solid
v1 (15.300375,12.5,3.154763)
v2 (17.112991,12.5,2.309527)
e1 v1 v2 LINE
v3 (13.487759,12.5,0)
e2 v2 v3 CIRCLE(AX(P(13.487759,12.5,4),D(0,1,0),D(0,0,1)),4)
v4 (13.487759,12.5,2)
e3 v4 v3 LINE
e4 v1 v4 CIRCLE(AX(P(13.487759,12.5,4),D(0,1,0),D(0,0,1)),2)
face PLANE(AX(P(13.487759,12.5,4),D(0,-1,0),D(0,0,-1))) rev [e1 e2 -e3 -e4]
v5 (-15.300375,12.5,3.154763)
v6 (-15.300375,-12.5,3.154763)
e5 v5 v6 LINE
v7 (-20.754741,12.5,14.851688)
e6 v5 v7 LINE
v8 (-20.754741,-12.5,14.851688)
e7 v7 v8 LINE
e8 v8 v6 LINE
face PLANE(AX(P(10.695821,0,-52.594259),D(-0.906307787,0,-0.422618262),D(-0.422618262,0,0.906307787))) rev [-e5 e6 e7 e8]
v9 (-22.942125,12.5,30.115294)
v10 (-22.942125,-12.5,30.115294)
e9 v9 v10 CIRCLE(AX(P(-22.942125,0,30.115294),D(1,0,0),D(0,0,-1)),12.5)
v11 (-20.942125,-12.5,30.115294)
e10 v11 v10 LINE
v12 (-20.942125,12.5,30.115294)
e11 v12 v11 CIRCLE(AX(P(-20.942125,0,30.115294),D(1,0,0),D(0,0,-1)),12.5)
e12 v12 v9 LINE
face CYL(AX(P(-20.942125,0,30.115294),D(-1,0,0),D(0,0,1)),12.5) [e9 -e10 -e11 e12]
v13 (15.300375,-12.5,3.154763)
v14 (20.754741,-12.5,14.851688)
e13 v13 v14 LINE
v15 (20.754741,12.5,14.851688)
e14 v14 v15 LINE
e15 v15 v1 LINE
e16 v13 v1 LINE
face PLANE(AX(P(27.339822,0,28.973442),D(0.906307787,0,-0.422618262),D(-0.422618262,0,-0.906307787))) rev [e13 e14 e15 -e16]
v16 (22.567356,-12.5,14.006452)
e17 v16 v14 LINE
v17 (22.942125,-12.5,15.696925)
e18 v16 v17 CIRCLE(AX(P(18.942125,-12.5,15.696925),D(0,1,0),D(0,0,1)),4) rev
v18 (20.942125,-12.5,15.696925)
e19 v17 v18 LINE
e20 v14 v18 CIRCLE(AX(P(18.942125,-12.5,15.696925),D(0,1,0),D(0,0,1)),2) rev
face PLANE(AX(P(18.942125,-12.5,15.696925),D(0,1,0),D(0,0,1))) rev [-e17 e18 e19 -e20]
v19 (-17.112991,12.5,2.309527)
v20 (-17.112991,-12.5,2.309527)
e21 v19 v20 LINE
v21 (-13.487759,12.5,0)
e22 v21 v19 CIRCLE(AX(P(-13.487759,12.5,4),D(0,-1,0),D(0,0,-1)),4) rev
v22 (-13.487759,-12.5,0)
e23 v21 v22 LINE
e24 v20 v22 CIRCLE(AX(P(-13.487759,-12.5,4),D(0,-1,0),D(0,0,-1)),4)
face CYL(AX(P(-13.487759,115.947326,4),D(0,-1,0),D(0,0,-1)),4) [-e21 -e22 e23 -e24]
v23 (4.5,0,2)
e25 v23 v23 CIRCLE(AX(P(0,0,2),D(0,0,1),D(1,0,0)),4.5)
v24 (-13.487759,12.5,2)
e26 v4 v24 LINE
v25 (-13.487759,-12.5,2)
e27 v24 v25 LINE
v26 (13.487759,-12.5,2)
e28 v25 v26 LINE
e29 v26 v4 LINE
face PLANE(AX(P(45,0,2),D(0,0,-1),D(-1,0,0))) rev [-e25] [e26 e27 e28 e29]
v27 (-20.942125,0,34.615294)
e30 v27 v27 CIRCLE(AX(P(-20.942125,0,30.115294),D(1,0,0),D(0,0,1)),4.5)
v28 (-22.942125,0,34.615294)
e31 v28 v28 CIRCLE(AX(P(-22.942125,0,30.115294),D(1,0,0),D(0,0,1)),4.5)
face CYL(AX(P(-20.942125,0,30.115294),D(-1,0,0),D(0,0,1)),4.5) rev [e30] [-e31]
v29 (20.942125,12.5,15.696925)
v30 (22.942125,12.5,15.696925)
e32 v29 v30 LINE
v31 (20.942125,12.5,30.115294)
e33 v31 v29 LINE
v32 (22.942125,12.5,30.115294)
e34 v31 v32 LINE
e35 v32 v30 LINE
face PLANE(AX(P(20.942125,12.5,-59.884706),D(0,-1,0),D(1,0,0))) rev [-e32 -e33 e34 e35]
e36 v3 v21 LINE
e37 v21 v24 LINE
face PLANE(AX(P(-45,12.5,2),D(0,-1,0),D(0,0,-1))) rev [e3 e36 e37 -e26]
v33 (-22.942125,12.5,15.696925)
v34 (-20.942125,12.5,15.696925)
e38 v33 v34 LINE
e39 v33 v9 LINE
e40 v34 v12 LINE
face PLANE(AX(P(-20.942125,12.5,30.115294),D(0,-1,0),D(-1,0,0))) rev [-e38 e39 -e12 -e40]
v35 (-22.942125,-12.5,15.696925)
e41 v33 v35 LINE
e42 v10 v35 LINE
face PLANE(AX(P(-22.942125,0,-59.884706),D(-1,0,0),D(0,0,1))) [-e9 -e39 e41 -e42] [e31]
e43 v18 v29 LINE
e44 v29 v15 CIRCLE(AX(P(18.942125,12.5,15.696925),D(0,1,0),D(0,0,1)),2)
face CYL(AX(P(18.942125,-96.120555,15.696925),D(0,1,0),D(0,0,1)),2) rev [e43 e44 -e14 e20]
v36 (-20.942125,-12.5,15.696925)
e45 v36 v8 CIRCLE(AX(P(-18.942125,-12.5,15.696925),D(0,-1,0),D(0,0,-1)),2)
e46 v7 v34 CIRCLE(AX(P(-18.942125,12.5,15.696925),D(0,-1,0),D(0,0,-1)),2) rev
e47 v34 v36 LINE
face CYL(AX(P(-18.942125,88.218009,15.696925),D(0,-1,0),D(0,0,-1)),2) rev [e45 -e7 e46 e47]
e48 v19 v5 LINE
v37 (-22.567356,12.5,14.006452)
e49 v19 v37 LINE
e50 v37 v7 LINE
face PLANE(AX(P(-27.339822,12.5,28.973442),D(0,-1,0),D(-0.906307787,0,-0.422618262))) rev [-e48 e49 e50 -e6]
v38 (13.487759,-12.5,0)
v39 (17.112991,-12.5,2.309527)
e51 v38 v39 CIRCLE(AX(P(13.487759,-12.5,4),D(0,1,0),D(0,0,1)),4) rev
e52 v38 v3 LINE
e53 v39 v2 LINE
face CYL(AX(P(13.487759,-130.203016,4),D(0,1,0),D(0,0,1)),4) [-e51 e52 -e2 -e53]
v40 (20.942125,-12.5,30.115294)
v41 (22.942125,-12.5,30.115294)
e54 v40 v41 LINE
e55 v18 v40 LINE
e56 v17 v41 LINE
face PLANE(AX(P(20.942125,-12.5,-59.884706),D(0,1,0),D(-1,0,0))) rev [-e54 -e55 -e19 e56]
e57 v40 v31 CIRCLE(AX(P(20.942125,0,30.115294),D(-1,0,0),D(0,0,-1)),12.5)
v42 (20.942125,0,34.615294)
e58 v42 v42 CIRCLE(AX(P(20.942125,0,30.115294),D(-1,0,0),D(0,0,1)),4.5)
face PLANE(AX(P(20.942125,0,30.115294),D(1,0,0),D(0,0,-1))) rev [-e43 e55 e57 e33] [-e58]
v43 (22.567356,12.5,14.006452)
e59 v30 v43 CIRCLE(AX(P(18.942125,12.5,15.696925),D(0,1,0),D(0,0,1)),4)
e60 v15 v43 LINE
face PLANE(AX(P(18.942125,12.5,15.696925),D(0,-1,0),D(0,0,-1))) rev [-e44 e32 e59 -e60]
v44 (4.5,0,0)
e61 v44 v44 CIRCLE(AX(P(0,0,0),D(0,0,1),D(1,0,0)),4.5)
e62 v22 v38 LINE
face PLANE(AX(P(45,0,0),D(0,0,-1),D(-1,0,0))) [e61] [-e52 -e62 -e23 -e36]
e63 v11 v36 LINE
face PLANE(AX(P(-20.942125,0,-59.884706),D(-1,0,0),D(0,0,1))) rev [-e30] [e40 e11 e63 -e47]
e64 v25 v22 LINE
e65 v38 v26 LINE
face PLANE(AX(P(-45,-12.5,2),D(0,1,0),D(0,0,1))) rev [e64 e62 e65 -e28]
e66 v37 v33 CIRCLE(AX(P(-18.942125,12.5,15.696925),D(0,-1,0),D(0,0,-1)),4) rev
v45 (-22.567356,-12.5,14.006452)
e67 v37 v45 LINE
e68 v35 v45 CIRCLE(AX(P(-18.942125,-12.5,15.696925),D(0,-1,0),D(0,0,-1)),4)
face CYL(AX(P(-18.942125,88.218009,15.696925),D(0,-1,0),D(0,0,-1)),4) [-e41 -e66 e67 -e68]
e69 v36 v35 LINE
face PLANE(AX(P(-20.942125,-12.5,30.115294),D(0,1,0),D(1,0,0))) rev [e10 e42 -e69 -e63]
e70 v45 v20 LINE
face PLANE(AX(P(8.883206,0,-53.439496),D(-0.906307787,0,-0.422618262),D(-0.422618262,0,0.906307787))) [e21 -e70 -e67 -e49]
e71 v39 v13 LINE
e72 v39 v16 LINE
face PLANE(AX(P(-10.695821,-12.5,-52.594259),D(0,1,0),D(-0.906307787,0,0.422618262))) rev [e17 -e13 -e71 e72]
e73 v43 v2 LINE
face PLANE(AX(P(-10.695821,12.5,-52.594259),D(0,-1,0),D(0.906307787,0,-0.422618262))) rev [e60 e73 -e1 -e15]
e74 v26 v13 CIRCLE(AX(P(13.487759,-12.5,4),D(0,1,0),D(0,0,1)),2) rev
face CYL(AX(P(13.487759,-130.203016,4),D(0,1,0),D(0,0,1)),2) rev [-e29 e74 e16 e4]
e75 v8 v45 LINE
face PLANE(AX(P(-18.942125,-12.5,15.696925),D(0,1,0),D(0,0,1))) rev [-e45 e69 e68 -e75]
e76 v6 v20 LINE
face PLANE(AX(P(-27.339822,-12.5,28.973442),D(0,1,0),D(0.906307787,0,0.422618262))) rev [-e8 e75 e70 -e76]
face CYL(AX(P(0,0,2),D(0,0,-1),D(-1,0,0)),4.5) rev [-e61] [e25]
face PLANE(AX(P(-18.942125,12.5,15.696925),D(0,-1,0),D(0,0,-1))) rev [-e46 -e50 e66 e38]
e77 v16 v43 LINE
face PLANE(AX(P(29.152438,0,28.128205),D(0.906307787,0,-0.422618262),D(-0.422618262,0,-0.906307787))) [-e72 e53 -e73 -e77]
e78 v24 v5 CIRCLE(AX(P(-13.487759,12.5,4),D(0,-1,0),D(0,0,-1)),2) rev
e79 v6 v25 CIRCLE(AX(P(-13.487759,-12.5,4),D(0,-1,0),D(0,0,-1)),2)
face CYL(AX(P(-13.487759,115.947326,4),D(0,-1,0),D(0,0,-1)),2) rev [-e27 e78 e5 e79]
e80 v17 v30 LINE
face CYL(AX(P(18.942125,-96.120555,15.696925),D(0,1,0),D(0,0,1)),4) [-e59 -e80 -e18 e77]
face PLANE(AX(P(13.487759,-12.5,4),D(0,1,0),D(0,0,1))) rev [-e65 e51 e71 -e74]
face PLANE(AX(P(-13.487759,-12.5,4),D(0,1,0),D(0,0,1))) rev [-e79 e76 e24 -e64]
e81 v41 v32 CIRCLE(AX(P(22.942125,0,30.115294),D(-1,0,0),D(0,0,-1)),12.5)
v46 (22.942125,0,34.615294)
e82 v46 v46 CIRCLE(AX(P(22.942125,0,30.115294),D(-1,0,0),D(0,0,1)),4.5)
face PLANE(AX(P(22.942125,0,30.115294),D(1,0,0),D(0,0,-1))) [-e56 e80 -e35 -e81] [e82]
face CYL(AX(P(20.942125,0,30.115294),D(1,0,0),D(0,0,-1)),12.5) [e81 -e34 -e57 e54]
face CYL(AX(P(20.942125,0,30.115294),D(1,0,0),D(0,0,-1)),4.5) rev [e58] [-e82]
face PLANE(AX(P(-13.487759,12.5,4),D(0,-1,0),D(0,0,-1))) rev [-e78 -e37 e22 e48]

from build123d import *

# Parameters (mm, degrees)
SKETCH1_R                  = 4.5
EXTRUDE1_DEPTH             = 2
PROCESS_BENDS1_START       = -58
PROCESS_BENDS1_OUTLINE_W   = 25
PROCESS_BENDS1_OUTLINE_H   = 2
PROCESS_BENDS1_DEPTH       = 40.887009382
PROCESS_BENDS1_START_2     = 17.112990618
PROCESS_BENDS1_2_OUTLINE_W = 25
PROCESS_BENDS1_2_OUTLINE_H = 2
PROCESS_BENDS1_2_DEPTH     = 40.887009382
PROCESS_BENDS1_START_3     = 13.596613306
PROCESS_BENDS1_3_OUTLINE_R = 4.5
PROCESS_BENDS1_3_DEPTH     = 9.345511755
PROCESS_BENDS1_START_4     = -22.942125061
PROCESS_BENDS1_4_OUTLINE_R = 4.5
PROCESS_BENDS1_4_DEPTH     = 9.157953378
PROCESS_BENDS1_START_5     = -12.5
PROCESS_BENDS1_5_DEPTH     = 25
PROCESS_BENDS1_6_DEPTH     = 25


with BuildPart() as part:
    # Sketch1 → Extrude1 (new body)
    with BuildSketch(Plane.XY):
        with BuildLine():
            Line((-45, 12.5), (45, 12.5))
            ThreePointArc((45, 12.5), (57.5, 0), (45, -12.5))
            Line((45, -12.5), (-45, -12.5))
            ThreePointArc((-45, -12.5), (-57.5, 0), (-45, 12.5))
        make_face()
        with Locations((45, 0)):
            Circle(SKETCH1_R, mode=Mode.SUBTRACT)
        with Locations(Location((-45, 0, 0), (0, 0, 180))):
            Circle(SKETCH1_R, mode=Mode.SUBTRACT)
        Circle(SKETCH1_R, mode=Mode.SUBTRACT)
    extrude(amount=EXTRUDE1_DEPTH)

    # Process-Bends1: read off the stored shape, not the designer's step
    # Process-Bends1 outline → Process-Bends1 (cut)
    with BuildSketch(Plane.YZ.offset(PROCESS_BENDS1_START)):
        with Locations((0, 1)):
            Rectangle(PROCESS_BENDS1_OUTLINE_W, PROCESS_BENDS1_OUTLINE_H)
    extrude(amount=PROCESS_BENDS1_DEPTH, mode=Mode.SUBTRACT)

    # Process-Bends1 2 outline → Process-Bends1 2 (cut)
    with BuildSketch(Plane.YZ.offset(PROCESS_BENDS1_START_2)):
        with Locations((0, 1)):
            Rectangle(PROCESS_BENDS1_2_OUTLINE_W, PROCESS_BENDS1_2_OUTLINE_H)
    extrude(amount=PROCESS_BENDS1_2_DEPTH, mode=Mode.SUBTRACT)

    # Process-Bends1 3 outline → Process-Bends1 3 (add)
    with BuildSketch(Plane.YZ.offset(PROCESS_BENDS1_START_3)):
        with BuildLine():
            ThreePointArc((12.5, 30.115293784), (0, 42.615293784), (-12.5, 30.115293784))
            Line((-12.5, 30.115293784), (-12.5, 2))
            Line((-12.5, 2), (12.5, 2))
            Line((12.5, 2), (12.5, 30.115293784))
        make_face()
        with Locations((0, 30.115293784)):
            Circle(PROCESS_BENDS1_3_OUTLINE_R, mode=Mode.SUBTRACT)
    extrude(amount=PROCESS_BENDS1_3_DEPTH)

    # Process-Bends1 4 outline → Process-Bends1 4 (add)
    with BuildSketch(Plane.YZ.offset(PROCESS_BENDS1_START_4)):
        with BuildLine():
            ThreePointArc((12.5, 30.115293784), (0, 42.615293784), (-12.5, 30.115293784))
            Line((-12.5, 30.115293784), (-12.5, 2))
            Line((-12.5, 2), (12.5, 2))
            Line((12.5, 2), (12.5, 30.115293784))
        make_face()
        with Locations((0, 30.115293784)):
            Circle(PROCESS_BENDS1_4_OUTLINE_R, mode=Mode.SUBTRACT)
    extrude(amount=PROCESS_BENDS1_4_DEPTH)

    # Process-Bends1 5 outline → Process-Bends1 5 (cut)
    with BuildSketch(Plane(origin=(0, 0, 0), x_dir=(1, 0, 0), z_dir=(0, 1, 0)).offset(PROCESS_BENDS1_START_5)):
        with BuildLine():
            ThreePointArc((-20.754740635, -14.851688233), (-20.894717075, -15.264045529), (-20.942125061, -15.696924757))
            Line((-20.942125061, -15.696924757), (-20.942125061, -44))
            Line((-20.942125061, -44), (-13.784171683, -44))
            Line((-13.784171683, -44), (-13.784171683, -2.022087009))
            ThreePointArc((-13.784171683, -2.022087009), (-14.684730041, -2.397732403), (-15.300375044, -3.154763477))
            Line((-15.300375044, -3.154763477), (-20.754740635, -14.851688233))
        make_face()
        with BuildLine():
            Line((13.596613306, -2.002964486), (13.596613306, -44))
            Line((13.596613306, -44), (20.942125061, -44))
            Line((20.942125061, -44), (20.942125061, -15.696924757))
            ThreePointArc((20.942125061, -15.696924757), (20.894717075, -15.264045529), (20.754740635, -14.851688233))
            Line((20.754740635, -14.851688233), (15.300375044, -3.154763477))
            ThreePointArc((15.300375044, -3.154763477), (14.607880625, -2.343096684), (13.596613306, -2.002964486))
        make_face()
        with BuildLine():
            Line((-22.942125061, -2), (-22.942125061, -15.696924757))
            ThreePointArc((-22.942125061, -15.696924757), (-22.847309089, -14.831166301), (-22.567356209, -14.00645171))
            Line((-22.567356209, -14.00645171), (-17.112990618, -2.309526953))
            ThreePointArc((-17.112990618, -2.309526953), (-15.636957903, -0.626434217), (-13.48775947, 0))
            Line((-13.48775947, 0), (-17.112990618, 0))
            Line((-17.112990618, 0), (-17.112990618, -2))
            Line((-17.112990618, -2), (-22.942125061, -2))
        make_face()
        with BuildLine():
            Line((22.942125061, -2), (17.112990618, -2))
            Line((17.112990618, -2), (17.112990618, 0))
            Line((17.112990618, 0), (13.48775947, 0))
            ThreePointArc((13.48775947, 0), (15.636957903, -0.626434217), (17.112990618, -2.309526953))
            Line((17.112990618, -2.309526953), (22.567356209, -14.00645171))
            ThreePointArc((22.567356209, -14.00645171), (22.847309089, -14.831166301), (22.942125061, -15.696924757))
            Line((22.942125061, -15.696924757), (22.942125061, -2))
        make_face()
    extrude(amount=PROCESS_BENDS1_5_DEPTH, mode=Mode.SUBTRACT)

    # Process-Bends1 6 outline → Process-Bends1 6 (add)
    with BuildSketch(Plane(origin=(0, 0, 0), x_dir=(1, 0, 0), z_dir=(0, 1, 0)).offset(PROCESS_BENDS1_START_5)):
        with BuildLine():
            Line((-13.784171683, -2), (-13.784171683, -2.022087009))
            ThreePointArc((-13.784171683, -2.022087009), (-13.636376458, -2.005529396), (-13.48775947, -2))
            Line((-13.48775947, -2), (-13.784171683, -2))
        make_face()
        with BuildLine():
            Line((13.596613306, -2.000000001), (13.48775947, -2))
            ThreePointArc((13.48775947, -2), (13.542206568, -2.000741259), (13.596613306, -2.002964486))
            Line((13.596613306, -2.002964486), (13.596613306, -2.000000001))
        make_face()
    extrude(amount=PROCESS_BENDS1_6_DEPTH)


solid = part.part
